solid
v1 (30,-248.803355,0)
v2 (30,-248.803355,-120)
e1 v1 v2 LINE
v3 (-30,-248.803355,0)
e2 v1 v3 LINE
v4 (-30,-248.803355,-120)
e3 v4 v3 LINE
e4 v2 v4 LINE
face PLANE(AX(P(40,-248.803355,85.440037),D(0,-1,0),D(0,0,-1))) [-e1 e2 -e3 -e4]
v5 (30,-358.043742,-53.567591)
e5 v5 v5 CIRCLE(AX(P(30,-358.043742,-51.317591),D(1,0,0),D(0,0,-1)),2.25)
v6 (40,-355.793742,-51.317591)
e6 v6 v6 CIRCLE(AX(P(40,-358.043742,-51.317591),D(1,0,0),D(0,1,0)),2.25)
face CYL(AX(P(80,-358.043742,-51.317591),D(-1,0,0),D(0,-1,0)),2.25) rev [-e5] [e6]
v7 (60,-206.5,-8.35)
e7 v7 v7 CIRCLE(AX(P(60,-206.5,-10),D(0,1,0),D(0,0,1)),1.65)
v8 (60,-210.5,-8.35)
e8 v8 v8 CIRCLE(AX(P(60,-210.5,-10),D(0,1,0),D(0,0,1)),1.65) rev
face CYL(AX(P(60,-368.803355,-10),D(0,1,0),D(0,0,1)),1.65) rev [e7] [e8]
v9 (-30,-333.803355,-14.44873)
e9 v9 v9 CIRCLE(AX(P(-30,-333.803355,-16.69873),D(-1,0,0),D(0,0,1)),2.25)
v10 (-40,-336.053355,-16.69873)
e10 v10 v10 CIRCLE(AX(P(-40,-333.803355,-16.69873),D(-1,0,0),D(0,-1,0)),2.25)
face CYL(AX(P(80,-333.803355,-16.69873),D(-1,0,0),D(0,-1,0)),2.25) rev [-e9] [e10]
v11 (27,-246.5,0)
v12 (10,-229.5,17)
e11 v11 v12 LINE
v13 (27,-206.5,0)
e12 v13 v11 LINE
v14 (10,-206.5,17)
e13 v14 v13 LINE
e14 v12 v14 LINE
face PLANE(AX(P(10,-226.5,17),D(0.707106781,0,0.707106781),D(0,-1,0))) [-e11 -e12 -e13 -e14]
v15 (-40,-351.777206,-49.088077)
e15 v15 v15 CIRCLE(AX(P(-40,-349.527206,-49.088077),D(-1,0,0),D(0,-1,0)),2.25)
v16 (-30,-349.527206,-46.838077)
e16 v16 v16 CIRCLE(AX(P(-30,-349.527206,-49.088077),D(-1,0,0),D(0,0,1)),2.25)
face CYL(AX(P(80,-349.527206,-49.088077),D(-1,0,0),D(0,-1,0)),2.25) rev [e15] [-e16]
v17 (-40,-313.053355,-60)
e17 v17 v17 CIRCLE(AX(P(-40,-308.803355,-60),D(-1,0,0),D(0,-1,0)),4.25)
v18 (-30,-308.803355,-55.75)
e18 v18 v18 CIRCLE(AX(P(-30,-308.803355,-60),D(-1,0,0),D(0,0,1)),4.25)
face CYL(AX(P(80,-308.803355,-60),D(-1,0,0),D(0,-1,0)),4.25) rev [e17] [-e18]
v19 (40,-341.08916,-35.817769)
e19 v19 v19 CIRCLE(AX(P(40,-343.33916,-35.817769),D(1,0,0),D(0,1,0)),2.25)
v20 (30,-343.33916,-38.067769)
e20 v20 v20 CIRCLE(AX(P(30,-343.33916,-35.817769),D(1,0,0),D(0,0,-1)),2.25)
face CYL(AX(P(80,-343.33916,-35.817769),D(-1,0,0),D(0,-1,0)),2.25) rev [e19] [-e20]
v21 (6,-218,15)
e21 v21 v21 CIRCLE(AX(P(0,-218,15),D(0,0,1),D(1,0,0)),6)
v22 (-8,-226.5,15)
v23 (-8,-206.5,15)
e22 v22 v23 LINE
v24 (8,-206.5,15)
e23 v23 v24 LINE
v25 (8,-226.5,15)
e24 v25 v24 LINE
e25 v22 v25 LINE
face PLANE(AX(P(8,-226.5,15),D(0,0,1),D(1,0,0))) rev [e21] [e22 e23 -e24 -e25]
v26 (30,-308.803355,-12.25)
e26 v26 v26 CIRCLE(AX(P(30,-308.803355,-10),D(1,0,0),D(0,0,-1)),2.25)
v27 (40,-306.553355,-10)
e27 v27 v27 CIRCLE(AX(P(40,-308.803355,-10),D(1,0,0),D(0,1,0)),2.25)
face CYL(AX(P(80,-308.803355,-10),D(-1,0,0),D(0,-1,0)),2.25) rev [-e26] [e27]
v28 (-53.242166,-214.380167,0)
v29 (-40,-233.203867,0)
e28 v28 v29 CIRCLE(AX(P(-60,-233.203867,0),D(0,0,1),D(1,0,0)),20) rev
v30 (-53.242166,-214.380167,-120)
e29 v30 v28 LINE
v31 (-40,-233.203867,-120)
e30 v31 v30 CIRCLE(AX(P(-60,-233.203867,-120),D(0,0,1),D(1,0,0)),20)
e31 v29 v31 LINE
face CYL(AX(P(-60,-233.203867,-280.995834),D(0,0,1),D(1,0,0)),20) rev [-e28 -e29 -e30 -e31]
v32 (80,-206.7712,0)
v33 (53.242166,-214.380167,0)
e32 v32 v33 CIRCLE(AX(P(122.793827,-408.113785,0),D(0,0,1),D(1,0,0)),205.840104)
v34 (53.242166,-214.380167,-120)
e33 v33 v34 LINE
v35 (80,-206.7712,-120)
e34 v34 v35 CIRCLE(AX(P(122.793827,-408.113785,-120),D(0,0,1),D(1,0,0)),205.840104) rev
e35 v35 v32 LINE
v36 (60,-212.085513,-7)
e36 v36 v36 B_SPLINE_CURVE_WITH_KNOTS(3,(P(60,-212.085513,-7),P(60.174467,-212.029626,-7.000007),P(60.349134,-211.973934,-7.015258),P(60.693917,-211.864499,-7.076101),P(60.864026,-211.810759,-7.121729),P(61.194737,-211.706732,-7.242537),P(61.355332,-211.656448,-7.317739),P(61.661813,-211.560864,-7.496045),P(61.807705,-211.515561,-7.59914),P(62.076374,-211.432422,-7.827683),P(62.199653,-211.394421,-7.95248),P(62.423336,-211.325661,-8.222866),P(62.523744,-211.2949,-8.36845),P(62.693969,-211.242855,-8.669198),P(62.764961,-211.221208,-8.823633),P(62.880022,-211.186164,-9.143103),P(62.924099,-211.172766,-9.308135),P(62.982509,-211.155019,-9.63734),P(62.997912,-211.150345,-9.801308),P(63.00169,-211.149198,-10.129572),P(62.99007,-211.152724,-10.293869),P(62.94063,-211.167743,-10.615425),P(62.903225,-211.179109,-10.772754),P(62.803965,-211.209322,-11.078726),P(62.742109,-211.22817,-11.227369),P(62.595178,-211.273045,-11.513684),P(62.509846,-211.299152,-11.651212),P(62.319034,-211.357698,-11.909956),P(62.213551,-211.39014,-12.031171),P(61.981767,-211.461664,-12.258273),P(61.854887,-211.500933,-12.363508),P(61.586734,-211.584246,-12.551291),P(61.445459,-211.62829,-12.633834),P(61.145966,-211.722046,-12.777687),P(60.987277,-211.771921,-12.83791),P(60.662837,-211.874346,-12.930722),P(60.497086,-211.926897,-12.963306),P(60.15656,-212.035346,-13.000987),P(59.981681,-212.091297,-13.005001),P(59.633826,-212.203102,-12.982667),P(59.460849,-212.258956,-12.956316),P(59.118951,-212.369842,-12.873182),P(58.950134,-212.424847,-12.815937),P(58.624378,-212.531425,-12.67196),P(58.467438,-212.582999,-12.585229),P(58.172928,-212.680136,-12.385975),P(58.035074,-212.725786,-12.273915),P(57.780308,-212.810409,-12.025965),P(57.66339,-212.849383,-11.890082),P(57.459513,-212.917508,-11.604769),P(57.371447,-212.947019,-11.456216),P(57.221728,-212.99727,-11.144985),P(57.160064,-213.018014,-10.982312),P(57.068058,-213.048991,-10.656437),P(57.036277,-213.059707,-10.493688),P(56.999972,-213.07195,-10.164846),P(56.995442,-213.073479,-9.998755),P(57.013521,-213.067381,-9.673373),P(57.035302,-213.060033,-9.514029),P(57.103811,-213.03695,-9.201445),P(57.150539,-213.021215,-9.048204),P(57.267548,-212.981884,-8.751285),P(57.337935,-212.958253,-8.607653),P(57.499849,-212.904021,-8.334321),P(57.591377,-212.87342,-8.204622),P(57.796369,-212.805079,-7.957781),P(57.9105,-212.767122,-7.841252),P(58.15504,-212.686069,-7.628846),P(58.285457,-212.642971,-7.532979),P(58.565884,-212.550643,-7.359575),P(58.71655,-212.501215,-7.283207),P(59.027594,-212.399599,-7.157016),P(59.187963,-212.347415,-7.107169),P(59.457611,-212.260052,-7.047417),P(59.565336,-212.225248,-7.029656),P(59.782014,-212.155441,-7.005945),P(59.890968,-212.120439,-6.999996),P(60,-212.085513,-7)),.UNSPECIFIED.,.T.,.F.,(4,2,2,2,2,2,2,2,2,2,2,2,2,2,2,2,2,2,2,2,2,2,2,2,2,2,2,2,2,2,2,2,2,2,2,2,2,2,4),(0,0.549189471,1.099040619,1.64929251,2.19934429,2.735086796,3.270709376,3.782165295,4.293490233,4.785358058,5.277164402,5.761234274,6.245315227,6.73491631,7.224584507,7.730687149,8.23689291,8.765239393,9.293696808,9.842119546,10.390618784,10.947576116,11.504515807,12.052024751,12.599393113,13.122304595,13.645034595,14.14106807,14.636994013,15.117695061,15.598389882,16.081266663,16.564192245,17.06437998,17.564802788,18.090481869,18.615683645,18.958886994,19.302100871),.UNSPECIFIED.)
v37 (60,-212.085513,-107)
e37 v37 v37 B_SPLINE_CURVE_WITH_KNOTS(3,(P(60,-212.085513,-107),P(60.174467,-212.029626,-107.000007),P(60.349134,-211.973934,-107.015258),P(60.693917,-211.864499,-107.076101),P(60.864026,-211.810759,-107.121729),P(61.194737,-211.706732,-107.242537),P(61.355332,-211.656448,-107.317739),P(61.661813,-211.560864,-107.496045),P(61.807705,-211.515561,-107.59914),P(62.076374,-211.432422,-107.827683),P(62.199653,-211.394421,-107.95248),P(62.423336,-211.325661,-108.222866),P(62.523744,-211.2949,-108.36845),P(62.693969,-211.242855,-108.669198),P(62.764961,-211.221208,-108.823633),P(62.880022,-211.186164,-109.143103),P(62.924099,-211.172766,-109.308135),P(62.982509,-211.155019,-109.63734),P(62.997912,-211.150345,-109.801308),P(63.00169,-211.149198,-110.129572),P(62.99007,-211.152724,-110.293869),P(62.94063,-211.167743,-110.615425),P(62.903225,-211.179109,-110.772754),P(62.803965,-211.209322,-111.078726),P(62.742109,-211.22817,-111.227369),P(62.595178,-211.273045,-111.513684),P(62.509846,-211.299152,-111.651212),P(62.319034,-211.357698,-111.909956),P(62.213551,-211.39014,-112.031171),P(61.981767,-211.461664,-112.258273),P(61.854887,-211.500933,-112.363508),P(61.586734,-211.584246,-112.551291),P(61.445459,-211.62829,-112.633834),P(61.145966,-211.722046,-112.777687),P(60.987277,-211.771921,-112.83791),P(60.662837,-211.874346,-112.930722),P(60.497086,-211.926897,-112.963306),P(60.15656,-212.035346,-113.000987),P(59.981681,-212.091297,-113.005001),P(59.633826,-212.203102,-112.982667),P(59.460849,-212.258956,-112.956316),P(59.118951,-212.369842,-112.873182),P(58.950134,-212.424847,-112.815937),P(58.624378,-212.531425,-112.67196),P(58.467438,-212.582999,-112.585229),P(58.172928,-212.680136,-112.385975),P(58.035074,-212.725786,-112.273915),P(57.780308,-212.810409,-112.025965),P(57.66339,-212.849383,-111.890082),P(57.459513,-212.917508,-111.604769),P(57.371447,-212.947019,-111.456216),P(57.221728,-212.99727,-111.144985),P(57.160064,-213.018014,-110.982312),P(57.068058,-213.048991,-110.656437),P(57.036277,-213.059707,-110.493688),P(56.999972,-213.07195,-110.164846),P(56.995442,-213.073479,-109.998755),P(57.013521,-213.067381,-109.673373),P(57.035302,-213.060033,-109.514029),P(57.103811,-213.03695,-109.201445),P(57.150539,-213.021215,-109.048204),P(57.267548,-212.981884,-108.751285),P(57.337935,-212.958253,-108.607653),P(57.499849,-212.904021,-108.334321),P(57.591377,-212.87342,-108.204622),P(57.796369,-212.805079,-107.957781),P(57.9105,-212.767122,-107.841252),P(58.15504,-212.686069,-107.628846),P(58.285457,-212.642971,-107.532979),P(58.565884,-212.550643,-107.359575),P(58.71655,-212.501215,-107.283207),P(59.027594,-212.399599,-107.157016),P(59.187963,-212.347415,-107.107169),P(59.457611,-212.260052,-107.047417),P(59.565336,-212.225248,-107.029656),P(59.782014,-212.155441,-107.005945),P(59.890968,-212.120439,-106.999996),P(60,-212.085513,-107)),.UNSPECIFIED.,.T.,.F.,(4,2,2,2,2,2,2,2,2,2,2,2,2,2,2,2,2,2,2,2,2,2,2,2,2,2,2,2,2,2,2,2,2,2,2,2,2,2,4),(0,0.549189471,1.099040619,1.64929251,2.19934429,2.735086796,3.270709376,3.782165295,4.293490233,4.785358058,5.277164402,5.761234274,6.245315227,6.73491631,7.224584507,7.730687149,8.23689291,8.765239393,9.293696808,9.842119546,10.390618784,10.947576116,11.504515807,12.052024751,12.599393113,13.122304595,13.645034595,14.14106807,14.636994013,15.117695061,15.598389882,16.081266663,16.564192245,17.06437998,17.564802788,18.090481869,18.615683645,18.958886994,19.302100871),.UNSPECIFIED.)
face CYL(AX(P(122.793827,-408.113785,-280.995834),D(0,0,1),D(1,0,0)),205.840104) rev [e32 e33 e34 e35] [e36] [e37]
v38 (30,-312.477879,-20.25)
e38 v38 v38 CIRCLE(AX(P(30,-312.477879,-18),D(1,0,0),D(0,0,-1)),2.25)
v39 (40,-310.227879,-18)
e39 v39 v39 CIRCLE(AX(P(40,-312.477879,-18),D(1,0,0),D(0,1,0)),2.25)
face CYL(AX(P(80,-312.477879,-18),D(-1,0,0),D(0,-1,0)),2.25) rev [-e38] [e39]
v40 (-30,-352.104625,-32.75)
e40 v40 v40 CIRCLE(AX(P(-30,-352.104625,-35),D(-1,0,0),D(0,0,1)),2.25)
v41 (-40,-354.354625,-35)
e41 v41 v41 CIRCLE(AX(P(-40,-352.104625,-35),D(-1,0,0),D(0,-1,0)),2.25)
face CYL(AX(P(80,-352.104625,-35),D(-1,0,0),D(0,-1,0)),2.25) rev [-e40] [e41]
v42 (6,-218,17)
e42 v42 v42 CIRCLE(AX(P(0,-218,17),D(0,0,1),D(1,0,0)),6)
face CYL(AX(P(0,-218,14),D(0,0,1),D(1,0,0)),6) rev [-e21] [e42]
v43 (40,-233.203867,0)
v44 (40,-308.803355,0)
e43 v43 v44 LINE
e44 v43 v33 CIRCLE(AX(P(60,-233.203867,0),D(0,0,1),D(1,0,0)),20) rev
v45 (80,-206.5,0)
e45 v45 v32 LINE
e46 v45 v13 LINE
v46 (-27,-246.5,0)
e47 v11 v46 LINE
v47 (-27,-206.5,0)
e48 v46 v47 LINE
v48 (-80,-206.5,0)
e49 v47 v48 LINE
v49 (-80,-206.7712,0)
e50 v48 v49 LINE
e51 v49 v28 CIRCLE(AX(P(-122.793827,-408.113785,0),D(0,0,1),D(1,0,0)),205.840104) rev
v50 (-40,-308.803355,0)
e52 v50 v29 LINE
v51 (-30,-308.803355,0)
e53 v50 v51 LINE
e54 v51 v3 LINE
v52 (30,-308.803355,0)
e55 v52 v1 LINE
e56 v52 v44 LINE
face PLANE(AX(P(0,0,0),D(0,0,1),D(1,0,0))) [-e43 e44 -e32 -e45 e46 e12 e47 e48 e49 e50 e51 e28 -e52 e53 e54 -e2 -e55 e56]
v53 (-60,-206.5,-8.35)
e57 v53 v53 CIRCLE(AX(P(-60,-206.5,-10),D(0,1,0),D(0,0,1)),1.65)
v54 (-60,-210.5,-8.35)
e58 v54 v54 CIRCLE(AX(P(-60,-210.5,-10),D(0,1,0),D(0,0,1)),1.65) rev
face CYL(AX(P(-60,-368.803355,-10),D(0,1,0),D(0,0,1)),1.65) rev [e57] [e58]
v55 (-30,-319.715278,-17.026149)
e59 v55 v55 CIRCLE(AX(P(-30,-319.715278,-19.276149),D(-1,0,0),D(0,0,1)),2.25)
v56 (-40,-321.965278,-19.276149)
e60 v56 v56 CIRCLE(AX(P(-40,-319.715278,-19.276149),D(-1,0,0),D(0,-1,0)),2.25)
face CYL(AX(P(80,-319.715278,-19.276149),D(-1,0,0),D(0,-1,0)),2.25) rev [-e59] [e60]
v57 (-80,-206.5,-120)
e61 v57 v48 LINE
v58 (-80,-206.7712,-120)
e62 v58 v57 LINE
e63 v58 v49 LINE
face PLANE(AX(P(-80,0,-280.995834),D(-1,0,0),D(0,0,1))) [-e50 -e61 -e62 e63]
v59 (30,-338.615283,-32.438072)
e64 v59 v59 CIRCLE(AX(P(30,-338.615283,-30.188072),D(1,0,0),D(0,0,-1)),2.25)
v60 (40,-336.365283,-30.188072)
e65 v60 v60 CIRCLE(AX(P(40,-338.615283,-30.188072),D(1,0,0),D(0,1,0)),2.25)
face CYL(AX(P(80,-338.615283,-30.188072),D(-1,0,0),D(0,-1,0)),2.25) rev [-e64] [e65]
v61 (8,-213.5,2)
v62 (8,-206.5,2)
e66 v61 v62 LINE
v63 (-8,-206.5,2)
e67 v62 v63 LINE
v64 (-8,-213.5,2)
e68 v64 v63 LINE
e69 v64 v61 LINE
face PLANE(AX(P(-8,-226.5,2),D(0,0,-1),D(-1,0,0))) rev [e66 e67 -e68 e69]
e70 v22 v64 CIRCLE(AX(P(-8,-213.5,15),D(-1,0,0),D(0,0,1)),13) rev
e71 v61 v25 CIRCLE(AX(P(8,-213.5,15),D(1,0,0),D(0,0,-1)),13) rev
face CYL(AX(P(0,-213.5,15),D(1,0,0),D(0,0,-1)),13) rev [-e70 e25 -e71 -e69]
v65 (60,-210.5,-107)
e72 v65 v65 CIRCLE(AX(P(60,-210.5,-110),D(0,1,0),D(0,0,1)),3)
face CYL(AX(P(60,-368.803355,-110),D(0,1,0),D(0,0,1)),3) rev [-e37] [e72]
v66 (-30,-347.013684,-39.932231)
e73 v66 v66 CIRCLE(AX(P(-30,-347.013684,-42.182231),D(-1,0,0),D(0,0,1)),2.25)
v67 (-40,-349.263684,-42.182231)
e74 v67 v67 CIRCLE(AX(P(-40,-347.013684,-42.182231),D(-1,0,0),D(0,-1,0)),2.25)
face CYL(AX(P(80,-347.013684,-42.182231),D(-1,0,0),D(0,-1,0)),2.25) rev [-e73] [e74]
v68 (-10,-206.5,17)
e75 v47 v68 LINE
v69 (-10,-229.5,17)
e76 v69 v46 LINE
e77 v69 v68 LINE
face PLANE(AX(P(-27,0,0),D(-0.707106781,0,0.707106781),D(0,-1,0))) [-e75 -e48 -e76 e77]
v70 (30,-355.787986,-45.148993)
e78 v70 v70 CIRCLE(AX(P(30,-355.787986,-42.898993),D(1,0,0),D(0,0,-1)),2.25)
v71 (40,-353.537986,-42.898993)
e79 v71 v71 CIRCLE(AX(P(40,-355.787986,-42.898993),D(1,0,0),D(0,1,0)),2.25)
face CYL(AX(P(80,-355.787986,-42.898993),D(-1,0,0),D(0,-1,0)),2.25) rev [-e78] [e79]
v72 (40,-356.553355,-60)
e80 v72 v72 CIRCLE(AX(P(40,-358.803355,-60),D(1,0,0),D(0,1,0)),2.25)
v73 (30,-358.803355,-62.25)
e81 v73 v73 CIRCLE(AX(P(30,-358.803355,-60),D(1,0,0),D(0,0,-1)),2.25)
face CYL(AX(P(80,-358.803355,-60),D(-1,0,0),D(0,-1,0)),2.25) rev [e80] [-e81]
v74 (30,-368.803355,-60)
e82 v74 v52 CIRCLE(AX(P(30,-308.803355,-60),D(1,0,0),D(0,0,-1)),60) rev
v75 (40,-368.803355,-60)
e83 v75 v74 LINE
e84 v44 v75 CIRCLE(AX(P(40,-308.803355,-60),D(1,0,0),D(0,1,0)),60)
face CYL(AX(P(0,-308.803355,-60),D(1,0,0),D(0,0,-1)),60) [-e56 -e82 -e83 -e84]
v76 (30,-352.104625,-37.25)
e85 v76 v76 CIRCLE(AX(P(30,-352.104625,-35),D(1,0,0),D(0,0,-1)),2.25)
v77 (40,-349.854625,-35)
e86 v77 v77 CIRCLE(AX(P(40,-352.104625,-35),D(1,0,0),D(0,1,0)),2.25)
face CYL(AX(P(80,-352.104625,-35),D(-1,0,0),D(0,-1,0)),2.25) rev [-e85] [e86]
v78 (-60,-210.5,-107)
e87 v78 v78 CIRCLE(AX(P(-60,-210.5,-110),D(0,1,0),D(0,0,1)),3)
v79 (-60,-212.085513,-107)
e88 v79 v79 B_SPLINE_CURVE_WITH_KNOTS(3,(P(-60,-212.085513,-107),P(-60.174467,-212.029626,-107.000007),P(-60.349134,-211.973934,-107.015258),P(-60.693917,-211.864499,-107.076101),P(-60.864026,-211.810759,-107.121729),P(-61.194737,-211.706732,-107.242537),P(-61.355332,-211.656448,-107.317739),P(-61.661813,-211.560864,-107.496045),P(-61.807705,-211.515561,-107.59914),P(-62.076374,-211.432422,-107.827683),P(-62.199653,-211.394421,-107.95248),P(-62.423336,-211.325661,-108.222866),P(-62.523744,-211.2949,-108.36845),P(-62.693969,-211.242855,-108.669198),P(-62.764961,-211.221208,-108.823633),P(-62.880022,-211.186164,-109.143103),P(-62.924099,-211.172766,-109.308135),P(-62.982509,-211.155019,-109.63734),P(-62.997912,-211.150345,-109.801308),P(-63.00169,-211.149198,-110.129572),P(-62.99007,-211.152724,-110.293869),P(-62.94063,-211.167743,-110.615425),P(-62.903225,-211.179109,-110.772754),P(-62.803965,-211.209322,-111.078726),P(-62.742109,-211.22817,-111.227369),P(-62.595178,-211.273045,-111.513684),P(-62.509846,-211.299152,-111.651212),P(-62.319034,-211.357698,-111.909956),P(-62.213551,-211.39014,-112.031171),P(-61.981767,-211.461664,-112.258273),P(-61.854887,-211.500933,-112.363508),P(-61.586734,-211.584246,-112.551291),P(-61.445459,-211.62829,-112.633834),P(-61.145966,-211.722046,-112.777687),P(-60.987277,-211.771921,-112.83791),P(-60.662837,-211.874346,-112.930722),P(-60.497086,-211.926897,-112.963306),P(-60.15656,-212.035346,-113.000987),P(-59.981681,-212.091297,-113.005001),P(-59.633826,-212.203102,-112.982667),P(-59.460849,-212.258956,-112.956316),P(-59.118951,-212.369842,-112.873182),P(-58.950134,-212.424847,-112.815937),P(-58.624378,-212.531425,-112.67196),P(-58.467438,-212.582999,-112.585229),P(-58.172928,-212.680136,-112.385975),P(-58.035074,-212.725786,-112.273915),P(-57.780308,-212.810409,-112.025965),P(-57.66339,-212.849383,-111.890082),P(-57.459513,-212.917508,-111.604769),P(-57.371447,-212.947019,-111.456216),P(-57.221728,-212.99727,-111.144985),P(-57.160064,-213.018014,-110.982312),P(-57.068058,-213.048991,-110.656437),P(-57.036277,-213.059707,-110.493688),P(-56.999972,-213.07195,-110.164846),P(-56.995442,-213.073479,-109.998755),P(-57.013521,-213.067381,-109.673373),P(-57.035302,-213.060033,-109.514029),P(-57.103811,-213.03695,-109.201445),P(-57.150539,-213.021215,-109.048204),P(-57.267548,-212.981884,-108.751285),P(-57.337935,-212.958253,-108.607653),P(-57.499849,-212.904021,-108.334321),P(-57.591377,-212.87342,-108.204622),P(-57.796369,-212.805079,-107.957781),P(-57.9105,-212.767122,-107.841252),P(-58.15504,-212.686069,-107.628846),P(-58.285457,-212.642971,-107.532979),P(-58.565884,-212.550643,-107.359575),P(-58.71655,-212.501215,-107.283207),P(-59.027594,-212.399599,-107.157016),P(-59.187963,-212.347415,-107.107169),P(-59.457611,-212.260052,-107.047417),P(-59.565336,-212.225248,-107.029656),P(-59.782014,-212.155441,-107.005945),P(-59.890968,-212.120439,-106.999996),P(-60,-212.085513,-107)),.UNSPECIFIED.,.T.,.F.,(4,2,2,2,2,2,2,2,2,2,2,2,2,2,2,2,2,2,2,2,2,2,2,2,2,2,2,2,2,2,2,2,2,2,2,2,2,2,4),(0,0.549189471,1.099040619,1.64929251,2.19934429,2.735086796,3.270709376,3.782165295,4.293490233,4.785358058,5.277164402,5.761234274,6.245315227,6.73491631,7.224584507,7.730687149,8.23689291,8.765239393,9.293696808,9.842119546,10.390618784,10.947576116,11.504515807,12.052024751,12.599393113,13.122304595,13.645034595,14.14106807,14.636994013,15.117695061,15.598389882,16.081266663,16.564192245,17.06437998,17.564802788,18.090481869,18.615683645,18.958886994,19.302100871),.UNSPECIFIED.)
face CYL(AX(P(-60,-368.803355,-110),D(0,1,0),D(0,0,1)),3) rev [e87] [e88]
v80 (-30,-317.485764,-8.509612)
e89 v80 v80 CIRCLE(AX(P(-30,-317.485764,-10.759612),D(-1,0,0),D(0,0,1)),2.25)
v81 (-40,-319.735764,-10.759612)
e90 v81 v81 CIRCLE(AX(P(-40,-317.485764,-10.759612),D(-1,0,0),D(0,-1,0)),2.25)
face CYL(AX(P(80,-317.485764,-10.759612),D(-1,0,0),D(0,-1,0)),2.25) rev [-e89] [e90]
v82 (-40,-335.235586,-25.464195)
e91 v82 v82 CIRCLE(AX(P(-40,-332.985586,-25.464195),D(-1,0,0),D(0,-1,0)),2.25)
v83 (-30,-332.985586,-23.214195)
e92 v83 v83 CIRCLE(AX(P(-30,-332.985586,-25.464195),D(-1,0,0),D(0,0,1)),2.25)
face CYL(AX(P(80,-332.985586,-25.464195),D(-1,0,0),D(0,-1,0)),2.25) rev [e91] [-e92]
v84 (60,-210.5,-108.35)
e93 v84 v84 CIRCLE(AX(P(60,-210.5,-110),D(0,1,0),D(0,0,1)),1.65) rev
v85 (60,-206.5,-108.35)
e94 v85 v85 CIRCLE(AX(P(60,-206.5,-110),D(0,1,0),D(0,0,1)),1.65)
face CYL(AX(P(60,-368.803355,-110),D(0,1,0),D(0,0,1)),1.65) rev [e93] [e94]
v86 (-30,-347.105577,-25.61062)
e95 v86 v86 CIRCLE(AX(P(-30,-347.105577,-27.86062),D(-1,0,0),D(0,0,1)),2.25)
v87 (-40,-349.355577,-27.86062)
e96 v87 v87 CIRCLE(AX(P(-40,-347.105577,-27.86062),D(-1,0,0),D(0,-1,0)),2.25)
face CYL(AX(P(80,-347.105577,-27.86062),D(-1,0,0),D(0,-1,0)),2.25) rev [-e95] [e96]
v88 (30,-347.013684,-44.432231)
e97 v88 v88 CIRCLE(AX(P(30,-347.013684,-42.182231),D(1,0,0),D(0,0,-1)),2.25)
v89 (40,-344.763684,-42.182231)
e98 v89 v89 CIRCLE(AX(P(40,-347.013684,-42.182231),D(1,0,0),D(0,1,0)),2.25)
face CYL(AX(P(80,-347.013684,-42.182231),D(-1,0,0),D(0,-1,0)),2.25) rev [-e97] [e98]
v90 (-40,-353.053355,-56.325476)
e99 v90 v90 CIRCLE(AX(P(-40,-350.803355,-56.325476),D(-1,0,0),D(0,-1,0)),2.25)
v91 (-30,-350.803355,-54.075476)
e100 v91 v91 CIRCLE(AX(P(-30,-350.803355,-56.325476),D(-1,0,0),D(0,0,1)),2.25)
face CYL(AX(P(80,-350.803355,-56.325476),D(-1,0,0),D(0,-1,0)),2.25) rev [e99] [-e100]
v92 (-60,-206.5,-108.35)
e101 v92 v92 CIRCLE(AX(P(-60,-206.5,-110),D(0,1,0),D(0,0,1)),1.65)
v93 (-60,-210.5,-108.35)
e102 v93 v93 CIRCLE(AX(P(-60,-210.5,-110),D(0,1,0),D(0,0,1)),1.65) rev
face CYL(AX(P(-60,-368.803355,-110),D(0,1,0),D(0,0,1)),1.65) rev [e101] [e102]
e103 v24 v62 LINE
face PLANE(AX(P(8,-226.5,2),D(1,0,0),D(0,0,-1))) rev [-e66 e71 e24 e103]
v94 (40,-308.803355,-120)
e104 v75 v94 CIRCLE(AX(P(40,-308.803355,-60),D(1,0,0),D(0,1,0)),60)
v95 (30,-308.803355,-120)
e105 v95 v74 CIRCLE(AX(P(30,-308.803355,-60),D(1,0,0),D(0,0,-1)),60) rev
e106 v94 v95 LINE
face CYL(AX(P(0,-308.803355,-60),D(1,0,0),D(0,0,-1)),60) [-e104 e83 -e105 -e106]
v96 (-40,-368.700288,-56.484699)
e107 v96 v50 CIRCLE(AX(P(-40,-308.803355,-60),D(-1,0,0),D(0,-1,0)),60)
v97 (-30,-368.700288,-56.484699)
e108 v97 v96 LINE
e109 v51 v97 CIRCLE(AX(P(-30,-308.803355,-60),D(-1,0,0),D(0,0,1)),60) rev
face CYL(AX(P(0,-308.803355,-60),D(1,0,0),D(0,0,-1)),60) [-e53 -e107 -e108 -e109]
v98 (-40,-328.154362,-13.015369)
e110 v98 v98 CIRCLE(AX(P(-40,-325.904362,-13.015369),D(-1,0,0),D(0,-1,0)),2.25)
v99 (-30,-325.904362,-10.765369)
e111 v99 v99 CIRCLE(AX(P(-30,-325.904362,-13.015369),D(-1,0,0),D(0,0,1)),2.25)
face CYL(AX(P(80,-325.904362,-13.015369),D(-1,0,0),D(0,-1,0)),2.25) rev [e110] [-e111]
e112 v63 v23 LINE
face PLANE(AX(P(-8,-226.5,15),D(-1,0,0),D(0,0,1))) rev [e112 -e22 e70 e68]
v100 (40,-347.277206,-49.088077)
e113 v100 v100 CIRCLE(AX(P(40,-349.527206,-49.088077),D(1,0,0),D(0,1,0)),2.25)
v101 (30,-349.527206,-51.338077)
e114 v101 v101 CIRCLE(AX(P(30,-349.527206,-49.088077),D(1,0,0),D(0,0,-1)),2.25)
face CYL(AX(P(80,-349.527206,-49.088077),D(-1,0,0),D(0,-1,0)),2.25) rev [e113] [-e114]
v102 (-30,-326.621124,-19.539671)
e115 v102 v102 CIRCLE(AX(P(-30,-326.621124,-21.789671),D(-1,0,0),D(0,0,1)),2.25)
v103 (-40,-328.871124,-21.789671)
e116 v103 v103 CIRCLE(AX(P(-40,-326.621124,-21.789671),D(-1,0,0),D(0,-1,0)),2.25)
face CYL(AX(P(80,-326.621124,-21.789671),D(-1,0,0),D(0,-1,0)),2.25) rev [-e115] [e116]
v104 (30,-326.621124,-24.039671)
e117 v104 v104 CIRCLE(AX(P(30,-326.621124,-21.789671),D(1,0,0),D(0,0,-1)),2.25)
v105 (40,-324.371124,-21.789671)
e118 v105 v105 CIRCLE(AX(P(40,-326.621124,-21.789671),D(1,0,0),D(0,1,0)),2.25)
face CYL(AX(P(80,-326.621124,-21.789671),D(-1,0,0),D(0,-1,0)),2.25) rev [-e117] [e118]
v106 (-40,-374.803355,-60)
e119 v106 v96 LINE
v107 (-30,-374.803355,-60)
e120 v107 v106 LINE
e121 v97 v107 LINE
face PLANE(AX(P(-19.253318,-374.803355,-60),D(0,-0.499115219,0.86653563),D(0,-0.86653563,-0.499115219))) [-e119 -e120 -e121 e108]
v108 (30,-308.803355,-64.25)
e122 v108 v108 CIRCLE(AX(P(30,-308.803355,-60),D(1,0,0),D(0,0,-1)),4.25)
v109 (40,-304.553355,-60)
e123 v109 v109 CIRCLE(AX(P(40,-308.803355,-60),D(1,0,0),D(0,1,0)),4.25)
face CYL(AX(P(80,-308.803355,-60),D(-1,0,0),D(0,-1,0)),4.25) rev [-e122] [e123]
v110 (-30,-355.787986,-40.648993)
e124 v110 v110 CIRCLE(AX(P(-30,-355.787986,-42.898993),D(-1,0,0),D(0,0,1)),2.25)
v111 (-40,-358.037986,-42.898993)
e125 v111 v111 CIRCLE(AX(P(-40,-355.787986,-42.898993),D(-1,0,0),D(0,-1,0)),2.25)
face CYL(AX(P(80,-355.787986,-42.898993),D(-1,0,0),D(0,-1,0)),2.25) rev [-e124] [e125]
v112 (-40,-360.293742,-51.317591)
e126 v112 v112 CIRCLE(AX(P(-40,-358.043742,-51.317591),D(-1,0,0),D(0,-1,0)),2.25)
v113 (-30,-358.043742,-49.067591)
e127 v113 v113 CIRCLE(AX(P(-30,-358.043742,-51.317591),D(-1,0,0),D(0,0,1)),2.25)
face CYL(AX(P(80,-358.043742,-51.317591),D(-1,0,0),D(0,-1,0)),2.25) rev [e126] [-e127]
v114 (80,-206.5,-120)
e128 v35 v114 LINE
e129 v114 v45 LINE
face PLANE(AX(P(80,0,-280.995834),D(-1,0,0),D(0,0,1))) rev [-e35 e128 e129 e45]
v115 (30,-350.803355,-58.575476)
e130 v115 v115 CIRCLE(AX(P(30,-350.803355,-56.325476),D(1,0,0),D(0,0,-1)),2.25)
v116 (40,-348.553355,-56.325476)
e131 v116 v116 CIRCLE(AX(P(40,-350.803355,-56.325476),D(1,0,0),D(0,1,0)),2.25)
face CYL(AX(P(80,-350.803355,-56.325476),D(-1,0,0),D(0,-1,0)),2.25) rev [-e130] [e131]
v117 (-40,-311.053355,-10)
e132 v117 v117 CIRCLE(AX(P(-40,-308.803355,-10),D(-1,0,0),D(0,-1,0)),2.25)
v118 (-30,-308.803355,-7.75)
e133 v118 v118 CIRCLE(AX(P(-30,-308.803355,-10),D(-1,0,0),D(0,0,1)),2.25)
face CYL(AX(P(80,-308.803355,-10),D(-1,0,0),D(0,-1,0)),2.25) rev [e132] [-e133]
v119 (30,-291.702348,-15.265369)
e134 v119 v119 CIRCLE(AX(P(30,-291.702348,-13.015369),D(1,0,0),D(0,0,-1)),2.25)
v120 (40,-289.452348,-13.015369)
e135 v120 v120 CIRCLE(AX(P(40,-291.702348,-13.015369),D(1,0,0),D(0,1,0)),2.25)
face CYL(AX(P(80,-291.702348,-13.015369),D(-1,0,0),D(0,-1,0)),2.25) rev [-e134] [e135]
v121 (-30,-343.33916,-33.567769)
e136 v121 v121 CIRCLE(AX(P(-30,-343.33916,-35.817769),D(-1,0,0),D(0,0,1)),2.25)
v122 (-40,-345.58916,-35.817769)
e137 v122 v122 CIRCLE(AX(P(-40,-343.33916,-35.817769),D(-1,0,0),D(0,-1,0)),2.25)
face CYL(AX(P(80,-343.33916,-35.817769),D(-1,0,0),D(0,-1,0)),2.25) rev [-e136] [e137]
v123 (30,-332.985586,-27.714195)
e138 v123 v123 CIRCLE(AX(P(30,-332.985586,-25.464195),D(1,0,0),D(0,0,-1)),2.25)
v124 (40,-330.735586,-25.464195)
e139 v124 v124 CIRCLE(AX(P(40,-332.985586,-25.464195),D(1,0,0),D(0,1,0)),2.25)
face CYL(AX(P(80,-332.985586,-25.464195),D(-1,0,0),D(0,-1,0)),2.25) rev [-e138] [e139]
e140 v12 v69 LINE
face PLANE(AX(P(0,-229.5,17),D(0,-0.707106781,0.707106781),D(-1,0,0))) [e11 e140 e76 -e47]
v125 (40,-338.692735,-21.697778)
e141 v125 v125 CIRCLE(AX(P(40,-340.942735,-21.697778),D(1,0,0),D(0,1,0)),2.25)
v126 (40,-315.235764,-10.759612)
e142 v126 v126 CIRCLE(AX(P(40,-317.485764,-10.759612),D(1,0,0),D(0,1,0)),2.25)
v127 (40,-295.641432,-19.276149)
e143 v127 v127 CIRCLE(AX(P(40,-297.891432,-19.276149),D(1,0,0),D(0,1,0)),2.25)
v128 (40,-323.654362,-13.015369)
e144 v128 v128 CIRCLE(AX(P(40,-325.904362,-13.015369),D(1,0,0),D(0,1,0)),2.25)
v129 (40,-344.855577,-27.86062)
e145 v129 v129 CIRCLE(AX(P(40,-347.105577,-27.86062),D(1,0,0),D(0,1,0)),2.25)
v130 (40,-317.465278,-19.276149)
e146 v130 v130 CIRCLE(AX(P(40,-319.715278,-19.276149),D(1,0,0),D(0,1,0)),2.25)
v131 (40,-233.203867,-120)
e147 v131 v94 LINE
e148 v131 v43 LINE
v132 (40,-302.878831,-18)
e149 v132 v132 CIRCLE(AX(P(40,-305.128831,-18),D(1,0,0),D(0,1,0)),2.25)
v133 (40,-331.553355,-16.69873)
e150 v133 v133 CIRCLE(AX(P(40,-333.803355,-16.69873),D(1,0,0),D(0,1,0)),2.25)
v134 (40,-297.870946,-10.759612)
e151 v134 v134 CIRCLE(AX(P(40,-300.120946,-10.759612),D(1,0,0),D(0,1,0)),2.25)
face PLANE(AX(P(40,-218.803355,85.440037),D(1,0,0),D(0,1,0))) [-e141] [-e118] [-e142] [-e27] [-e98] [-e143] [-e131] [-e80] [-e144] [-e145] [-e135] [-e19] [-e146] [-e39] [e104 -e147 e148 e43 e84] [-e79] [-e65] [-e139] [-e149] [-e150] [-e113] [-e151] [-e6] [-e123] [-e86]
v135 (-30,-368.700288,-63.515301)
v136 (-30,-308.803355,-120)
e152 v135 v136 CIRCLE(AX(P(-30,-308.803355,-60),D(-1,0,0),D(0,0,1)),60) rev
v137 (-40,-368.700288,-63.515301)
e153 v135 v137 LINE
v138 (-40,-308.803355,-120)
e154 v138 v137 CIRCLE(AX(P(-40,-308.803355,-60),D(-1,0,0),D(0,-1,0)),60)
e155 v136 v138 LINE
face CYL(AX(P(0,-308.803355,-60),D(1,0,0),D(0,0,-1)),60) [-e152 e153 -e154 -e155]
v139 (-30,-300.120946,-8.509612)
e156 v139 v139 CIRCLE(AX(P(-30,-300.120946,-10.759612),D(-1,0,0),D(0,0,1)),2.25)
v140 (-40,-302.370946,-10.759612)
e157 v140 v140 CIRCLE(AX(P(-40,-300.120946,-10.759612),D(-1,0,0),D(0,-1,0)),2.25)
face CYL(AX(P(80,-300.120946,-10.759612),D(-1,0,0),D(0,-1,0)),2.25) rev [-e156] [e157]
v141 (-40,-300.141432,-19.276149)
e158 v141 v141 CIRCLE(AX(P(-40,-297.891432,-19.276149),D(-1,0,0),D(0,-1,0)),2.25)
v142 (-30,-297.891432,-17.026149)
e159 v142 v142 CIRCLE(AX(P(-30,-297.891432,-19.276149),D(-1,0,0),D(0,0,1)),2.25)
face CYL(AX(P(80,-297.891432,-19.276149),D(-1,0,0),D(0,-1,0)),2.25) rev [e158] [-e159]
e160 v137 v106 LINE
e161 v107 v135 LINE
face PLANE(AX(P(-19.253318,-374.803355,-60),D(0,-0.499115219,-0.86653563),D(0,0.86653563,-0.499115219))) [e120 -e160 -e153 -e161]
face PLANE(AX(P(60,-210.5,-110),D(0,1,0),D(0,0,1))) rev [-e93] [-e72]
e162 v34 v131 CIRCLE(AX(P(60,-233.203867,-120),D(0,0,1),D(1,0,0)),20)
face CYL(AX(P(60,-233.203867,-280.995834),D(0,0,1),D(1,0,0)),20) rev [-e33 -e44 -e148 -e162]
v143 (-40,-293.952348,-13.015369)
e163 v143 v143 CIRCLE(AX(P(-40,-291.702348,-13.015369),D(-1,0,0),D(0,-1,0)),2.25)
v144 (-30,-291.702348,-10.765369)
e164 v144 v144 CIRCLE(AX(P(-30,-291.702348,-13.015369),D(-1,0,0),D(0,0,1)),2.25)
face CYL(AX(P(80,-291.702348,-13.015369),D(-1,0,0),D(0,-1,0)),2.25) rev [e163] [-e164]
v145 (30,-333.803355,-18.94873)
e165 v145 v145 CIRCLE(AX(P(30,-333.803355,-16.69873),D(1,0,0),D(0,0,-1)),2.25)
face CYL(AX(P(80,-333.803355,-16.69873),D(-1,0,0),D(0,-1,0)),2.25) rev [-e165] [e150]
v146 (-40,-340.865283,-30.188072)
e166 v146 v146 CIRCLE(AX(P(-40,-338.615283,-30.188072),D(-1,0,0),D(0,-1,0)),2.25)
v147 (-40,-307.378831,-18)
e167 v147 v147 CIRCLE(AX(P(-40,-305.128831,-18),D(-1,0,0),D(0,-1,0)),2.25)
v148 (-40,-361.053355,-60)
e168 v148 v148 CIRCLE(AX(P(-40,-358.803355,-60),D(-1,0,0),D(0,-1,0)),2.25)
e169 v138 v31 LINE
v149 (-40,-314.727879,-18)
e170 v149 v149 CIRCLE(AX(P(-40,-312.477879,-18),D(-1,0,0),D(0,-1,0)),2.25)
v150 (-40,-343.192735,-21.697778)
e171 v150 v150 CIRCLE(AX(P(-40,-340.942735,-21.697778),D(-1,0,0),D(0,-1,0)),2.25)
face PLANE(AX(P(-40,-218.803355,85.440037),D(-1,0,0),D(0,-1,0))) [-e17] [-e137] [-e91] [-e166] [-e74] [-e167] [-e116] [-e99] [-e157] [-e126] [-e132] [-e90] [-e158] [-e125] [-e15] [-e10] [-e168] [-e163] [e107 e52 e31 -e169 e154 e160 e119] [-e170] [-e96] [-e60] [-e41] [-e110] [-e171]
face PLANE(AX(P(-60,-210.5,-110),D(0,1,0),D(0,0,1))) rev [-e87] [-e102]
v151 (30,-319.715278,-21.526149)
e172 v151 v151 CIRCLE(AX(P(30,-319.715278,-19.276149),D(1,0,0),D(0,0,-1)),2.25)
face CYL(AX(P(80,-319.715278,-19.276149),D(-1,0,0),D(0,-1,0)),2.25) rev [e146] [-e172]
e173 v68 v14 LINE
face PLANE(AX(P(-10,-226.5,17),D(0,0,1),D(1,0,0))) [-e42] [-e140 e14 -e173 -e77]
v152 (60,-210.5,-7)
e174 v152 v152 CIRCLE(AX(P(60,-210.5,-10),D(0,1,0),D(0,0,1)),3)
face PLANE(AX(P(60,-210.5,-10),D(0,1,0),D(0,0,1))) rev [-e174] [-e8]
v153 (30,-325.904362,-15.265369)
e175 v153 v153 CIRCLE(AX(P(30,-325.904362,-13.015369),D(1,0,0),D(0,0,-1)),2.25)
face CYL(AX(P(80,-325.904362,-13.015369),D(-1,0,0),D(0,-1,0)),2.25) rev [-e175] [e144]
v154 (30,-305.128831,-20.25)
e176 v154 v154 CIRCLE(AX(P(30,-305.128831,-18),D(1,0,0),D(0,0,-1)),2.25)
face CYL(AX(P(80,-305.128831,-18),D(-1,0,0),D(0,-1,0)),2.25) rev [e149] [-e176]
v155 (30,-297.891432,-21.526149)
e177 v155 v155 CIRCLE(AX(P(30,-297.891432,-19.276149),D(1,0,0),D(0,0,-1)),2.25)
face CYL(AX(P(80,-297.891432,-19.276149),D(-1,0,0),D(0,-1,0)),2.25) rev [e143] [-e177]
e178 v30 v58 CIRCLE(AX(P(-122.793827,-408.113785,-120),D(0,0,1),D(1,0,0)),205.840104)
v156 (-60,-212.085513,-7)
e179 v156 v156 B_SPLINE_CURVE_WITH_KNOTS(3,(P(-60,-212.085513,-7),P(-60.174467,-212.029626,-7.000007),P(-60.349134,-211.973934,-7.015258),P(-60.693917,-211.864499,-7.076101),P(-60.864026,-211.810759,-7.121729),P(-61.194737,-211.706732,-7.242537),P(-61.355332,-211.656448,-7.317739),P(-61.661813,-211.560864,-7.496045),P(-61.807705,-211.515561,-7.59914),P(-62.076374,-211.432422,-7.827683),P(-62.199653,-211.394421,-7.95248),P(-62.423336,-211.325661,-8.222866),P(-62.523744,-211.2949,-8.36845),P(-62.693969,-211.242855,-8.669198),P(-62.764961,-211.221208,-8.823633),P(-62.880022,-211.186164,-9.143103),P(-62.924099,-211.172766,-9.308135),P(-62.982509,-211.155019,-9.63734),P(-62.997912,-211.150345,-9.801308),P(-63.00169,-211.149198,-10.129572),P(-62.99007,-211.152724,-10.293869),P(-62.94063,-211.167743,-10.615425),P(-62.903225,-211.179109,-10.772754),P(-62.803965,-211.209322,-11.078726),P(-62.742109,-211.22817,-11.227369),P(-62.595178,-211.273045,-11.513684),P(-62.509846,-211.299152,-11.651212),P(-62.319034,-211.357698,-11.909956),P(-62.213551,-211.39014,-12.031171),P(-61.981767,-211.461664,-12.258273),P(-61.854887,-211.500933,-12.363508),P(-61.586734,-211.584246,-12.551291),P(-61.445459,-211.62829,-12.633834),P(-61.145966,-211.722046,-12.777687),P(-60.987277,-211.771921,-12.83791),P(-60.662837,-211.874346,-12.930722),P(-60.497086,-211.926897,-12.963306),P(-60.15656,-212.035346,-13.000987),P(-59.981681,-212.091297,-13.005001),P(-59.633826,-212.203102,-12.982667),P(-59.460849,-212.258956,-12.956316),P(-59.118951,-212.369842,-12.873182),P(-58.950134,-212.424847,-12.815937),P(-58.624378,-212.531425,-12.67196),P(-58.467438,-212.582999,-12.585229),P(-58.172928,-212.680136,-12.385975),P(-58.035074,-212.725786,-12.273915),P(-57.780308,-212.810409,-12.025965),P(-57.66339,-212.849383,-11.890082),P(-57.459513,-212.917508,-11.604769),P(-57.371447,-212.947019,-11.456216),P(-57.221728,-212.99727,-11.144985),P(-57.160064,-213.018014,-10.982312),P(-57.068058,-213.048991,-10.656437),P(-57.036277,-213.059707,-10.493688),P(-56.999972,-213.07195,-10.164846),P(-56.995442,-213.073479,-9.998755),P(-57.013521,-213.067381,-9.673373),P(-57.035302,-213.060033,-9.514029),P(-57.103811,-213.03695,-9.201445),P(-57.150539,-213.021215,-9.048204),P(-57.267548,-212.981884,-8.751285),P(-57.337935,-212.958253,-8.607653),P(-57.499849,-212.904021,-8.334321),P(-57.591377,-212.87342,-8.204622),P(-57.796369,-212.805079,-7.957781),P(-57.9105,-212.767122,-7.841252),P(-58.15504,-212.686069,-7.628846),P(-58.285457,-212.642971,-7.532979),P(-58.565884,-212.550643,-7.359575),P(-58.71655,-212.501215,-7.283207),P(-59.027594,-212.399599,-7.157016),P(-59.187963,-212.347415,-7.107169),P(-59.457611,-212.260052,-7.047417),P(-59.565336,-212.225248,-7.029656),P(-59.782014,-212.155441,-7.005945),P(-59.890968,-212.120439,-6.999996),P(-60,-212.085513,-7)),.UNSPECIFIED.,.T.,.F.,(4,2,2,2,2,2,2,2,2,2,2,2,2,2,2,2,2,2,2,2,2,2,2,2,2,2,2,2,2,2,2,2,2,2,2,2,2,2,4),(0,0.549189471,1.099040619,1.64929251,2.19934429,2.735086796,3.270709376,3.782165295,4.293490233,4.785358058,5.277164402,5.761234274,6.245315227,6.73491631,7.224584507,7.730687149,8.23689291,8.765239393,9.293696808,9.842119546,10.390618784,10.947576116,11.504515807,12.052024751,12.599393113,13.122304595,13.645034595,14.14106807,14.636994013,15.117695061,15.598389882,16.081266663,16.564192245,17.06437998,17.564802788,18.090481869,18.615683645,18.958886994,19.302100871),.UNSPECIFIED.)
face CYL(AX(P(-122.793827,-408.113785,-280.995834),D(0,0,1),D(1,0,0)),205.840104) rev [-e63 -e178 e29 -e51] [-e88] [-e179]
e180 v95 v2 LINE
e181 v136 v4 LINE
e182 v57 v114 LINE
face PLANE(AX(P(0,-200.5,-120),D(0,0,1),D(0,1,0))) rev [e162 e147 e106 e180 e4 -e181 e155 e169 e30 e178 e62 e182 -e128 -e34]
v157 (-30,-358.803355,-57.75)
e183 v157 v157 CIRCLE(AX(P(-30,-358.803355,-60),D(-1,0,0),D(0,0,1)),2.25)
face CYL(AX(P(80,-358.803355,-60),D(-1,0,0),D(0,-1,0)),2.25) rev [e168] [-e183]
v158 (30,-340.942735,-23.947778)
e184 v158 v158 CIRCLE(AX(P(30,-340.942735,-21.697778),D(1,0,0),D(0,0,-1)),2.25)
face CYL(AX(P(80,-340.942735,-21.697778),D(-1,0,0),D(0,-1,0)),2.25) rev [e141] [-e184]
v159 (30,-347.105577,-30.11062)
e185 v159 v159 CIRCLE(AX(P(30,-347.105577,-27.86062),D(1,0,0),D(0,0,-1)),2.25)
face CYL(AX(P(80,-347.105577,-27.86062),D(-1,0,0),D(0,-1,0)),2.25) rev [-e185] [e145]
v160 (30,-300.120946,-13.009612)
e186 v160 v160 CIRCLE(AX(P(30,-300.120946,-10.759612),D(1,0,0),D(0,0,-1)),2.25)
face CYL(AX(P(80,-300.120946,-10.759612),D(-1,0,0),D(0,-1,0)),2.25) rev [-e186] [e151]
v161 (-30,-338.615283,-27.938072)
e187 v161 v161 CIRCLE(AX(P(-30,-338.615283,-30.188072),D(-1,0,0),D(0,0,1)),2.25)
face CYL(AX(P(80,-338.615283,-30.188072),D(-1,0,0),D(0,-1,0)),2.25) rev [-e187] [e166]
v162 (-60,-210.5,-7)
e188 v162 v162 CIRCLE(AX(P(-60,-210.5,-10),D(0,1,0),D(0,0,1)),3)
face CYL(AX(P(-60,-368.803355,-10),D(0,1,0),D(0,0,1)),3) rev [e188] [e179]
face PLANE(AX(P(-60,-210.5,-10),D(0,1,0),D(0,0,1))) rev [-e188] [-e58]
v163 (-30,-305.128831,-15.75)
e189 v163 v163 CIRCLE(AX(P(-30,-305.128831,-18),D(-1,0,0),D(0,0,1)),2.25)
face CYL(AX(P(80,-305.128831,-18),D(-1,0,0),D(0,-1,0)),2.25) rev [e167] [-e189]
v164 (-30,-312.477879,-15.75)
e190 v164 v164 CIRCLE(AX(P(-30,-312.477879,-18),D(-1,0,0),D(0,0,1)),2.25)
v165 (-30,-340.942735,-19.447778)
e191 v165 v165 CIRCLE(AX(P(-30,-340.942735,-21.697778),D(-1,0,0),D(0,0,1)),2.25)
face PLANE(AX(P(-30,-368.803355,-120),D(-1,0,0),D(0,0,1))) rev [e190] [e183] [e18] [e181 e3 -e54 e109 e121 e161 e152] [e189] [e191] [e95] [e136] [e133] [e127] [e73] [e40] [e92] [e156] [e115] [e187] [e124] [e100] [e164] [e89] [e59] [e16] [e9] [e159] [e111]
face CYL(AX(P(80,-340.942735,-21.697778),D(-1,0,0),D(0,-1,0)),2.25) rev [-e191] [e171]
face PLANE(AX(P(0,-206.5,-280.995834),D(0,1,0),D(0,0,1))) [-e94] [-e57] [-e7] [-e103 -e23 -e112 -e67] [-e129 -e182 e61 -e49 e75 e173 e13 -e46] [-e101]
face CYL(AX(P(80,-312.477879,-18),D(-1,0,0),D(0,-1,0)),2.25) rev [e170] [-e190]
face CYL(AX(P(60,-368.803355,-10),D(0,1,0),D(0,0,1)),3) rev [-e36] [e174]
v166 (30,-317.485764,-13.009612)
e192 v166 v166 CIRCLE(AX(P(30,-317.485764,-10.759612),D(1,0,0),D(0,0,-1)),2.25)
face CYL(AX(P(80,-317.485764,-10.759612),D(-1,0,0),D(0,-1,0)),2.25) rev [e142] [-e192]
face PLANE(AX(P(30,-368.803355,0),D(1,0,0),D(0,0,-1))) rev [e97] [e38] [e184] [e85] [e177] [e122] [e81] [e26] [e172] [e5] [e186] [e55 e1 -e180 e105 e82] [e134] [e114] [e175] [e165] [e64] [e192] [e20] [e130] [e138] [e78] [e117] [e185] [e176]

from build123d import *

# Parameters (mm, degrees)
BOSS_EXTRUDE1_DEPTH = 120
SKETCH2_W           = 80
SKETCH2_H           = 30
BOSS_EXTRUDE2_DEPTH = 120
FILLET1_R           = 20
SKETCH3_W           = 10
SKETCH3_H           = 120
BOSS_EXTRUDE3_DEPTH = 120
FILLET2_R           = 60
SKETCH4_R           = 4.25
SKETCH4_R_2         = 2.25
CUT_EXTRUDE1_DEPTH  = 406.975263542
SKETCH6_W           = 20
SKETCH6_H           = 17
SKETCH6_W_2         = 16
SKETCH6_H_2         = 13
BOSS_EXTRUDE4_DEPTH = 20
SKETCH7_W           = 20
SKETCH7_H           = 17
BOSS_EXTRUDE5_DEPTH = 3
FILLET3_R           = 13
SKETCH8_R           = 6
CUT_EXTRUDE2_DEPTH  = 3
CHAMFER1_SIZE       = 17
SKETCH10_R          = 1.65
CUT_EXTRUDE3_DEPTH  = 218.122958345
SKETCH11_R          = 3
CUT_EXTRUDE4_DEPTH  = 215.149368903
BOSS_EXTRUDE6_DEPTH = 10
CHAMFER3_SIZE       = 17


with BuildPart() as part:
    # Sketch1 → Boss-Extrude1 (new body)
    with BuildSketch(Plane.XY):
        with BuildLine():
            Line((80, -206.5), (-80, -206.5))
            Line((-80, -206.5), (-80, -206.771199773))
            ThreePointArc((-80, -206.771199773), (-65.350122978, -210.451524762), (-51.0095809, -215.196263078))
            ThreePointArc((-51.0095809, -215.196263078), (0, -224.378994833), (51.0095809, -215.196263078))
            ThreePointArc((51.0095809, -215.196263078), (65.350122978, -210.451524762), (80, -206.771199773))
            Line((80, -206.771199773), (80, -206.5))
        make_face()
    extrude(amount=-BOSS_EXTRUDE1_DEPTH)

    # Sketch2 → Boss-Extrude2 (add)
    with BuildSketch(Plane(origin=(0, 0, -120), x_dir=(-1, 0, 0), z_dir=(0, 0, -1))):
        with Locations((0, -233.803354766)):
            Rectangle(SKETCH2_W, SKETCH2_H)
    extrude(amount=-BOSS_EXTRUDE2_DEPTH)

    # Fillet1
    fillet1_edges = [part.edges().sort_by_distance(p)[0] for p in [
        (40, -218.803354766, -60),
        (-40, -218.803354766, -60),
    ]]
    fillet(fillet1_edges, radius=FILLET1_R)

    # Sketch3 → Boss-Extrude3 (add)
    with BuildSketch(Plane.XZ.offset(248.803354766)):
        with Locations((35, -60)):
            Rectangle(SKETCH3_W, SKETCH3_H)
        with Locations((-35, -60)):
            Rectangle(SKETCH3_W, SKETCH3_H)
    extrude(amount=BOSS_EXTRUDE3_DEPTH)

    # Fillet2
    fillet2_edges = [part.edges().sort_by_distance(p)[0] for p in [
        (35, -368.803354766, -120),
        (35, -368.803354766, 0),
        (-35, -368.803354766, 0),
        (-35, -368.803354766, -120),
    ]]
    fillet(fillet2_edges, radius=FILLET2_R - 0.0001)  # a hair under: the kernel refuses the full size

    # Sketch4 → Cut-Extrude1 (cut, through all)
    with BuildSketch(Plane.ZY.offset(40)):
        with Locations(Location((-60, -308.803354766, 0), (0, 0, 270))):
            Circle(SKETCH4_R)
        with Locations(Location((-60, -358.803354766, 0), (0, 0, 270))):
            Circle(SKETCH4_R_2)
        with Locations(Location((-51.317591117, -358.043742416, 0), (0, 0, 270))):
            Circle(SKETCH4_R_2)
        with Locations(Location((-42.898992834, -355.787985805, 0), (0, 0, 270))):
            Circle(SKETCH4_R_2)
        with Locations(Location((-35, -352.104624955, 0), (0, 0, 270))):
            Circle(SKETCH4_R_2)
        with Locations(Location((-27.860619516, -347.105576922, 0), (0, 0, 270))):
            Circle(SKETCH4_R_2)
        with Locations(Location((-21.697777844, -340.94273525, 0), (0, 0, 270))):
            Circle(SKETCH4_R_2)
        with Locations(Location((-16.698729811, -333.803354766, 0), (0, 0, 270))):
            Circle(SKETCH4_R_2)
        with Locations(Location((-13.015368961, -325.904361932, 0), (0, 0, 270))):
            Circle(SKETCH4_R_2)
        with Locations(Location((-10.759612349, -317.485763649, 0), (0, 0, 270))):
            Circle(SKETCH4_R_2)
        with Locations(Location((-10, -308.803354766, 0), (0, 0, 270))):
            Circle(SKETCH4_R_2)
        with Locations(Location((-10.759612349, -300.120945882, 0), (0, 0, 270))):
            Circle(SKETCH4_R_2)
        with Locations(Location((-13.015368961, -291.702347599, 0), (0, 0, 270))):
            Circle(SKETCH4_R_2)
        with Locations(Location((-56.325476132, -350.803354766, 0), (0, 0, 270))):
            Circle(SKETCH4_R_2)
        with Locations(Location((-49.088076944, -349.527206019, 0), (0, 0, 270))):
            Circle(SKETCH4_R_2)
        with Locations(Location((-42.182231017, -347.013683659, 0), (0, 0, 270))):
            Circle(SKETCH4_R_2)
        with Locations(Location((-35.817768983, -343.339159791, 0), (0, 0, 270))):
            Circle(SKETCH4_R_2)
        with Locations(Location((-30.188071803, -338.615282963, 0), (0, 0, 270))):
            Circle(SKETCH4_R_2)
        with Locations(Location((-25.464194975, -332.985585782, 0), (0, 0, 270))):
            Circle(SKETCH4_R_2)
        with Locations(Location((-21.789671107, -326.621123749, 0), (0, 0, 270))):
            Circle(SKETCH4_R_2)
        with Locations(Location((-19.276148747, -319.715277822, 0), (0, 0, 270))):
            Circle(SKETCH4_R_2)
        with Locations(Location((-18, -312.477878634, 0), (0, 0, 270))):
            Circle(SKETCH4_R_2)
        with Locations(Location((-18, -305.128830898, 0), (0, 0, 270))):
            Circle(SKETCH4_R_2)
        with Locations(Location((-19.276148747, -297.89143171, 0), (0, 0, 270))):
            Circle(SKETCH4_R_2)
    extrude(amount=-CUT_EXTRUDE1_DEPTH, mode=Mode.SUBTRACT)

    # Sketch6 → Boss-Extrude4 (add)
    with BuildSketch(Plane(origin=(0, -206.5, 0), x_dir=(1, 0, 0), z_dir=(0, 1, 0))):
        with Locations((0, -8.5)):
            Rectangle(SKETCH6_W, SKETCH6_H)
        with Locations((0, -8.5)):
            Rectangle(SKETCH6_W_2, SKETCH6_H_2, mode=Mode.SUBTRACT)
    extrude(amount=-BOSS_EXTRUDE4_DEPTH)

    # Sketch7 → Boss-Extrude5 (add)
    with BuildSketch(Plane.XZ.offset(226.5)):
        with Locations((0, 8.5)):
            Rectangle(SKETCH7_W, SKETCH7_H)
    extrude(amount=BOSS_EXTRUDE5_DEPTH)

    # Fillet3
    fillet3_edges = [part.edges().sort_by_distance(p)[0] for p in [
        (0, -226.5, 2),
    ]]
    fillet(fillet3_edges, radius=FILLET3_R - 0.0001)  # a hair under: the kernel refuses the full size

    # Sketch8 → Cut-Extrude2 (cut)
    with BuildSketch(Plane.XY.offset(17)):
        with Locations((0, -218)):
            Circle(SKETCH8_R)
    extrude(amount=-CUT_EXTRUDE2_DEPTH, mode=Mode.SUBTRACT)

    # Chamfer1
    chamfer1_edges = [part.edges().sort_by_distance(p)[0] for p in [
        (0, -229.5, 0),
    ]]
    chamfer(chamfer1_edges, length=CHAMFER1_SIZE - 0.0001)  # a hair under: the kernel refuses the full size

    # Sketch10 → Cut-Extrude3 (cut, through all)
    with BuildSketch(Plane(origin=(0, -206.5, 0), x_dir=(1, 0, 0), z_dir=(0, 1, 0))):
        with Locations(Location((-60, 110, 0), (0, 0, 270))):
            Circle(SKETCH10_R)
        with Locations(Location((-60, 10, 0), (0, 0, 270))):
            Circle(SKETCH10_R)
        with Locations(Location((60, 10, 0), (0, 0, 270))):
            Circle(SKETCH10_R)
        with Locations(Location((60, 110, 0), (0, 0, 270))):
            Circle(SKETCH10_R)
    extrude(amount=-CUT_EXTRUDE3_DEPTH, mode=Mode.SUBTRACT)

    # Sketch11 → Cut-Extrude4 (cut, through all)
    with BuildSketch(Plane(origin=(0, -210.5, 0), x_dir=(1, 0, 0), z_dir=(0, 1, 0))):
        with Locations(Location((-60, 110, 0), (0, 0, 270))):
            Circle(SKETCH11_R)
        with Locations(Location((-60, 10, 0), (0, 0, 270))):
            Circle(SKETCH11_R)
        with Locations(Location((60, 110, 0), (0, 0, 270))):
            Circle(SKETCH11_R)
        with Locations(Location((60, 10, 0), (0, 0, 270))):
            Circle(SKETCH11_R)
    extrude(amount=-CUT_EXTRUDE4_DEPTH, mode=Mode.SUBTRACT)

    # Sketch13 → Boss-Extrude6 (add)
    with BuildSketch(Plane.ZY.offset(40)):
        Polygon((-60, -374.803354766), (-63.515300685, -368.700288419), (-60, -366.67551297), (-56.484699315, -368.700288419), align=None)
    extrude(amount=-BOSS_EXTRUDE6_DEPTH)

    # Chamfer3
    chamfer3_edges = [part.edges().sort_by_distance(p)[0] for p in [
        (10, -226.49995, 0),
        (-10, -226.49995, 0),
    ]]
    chamfer(chamfer3_edges, length=CHAMFER3_SIZE - 0.0001)  # a hair under: the kernel refuses the full size


solid = part.part
